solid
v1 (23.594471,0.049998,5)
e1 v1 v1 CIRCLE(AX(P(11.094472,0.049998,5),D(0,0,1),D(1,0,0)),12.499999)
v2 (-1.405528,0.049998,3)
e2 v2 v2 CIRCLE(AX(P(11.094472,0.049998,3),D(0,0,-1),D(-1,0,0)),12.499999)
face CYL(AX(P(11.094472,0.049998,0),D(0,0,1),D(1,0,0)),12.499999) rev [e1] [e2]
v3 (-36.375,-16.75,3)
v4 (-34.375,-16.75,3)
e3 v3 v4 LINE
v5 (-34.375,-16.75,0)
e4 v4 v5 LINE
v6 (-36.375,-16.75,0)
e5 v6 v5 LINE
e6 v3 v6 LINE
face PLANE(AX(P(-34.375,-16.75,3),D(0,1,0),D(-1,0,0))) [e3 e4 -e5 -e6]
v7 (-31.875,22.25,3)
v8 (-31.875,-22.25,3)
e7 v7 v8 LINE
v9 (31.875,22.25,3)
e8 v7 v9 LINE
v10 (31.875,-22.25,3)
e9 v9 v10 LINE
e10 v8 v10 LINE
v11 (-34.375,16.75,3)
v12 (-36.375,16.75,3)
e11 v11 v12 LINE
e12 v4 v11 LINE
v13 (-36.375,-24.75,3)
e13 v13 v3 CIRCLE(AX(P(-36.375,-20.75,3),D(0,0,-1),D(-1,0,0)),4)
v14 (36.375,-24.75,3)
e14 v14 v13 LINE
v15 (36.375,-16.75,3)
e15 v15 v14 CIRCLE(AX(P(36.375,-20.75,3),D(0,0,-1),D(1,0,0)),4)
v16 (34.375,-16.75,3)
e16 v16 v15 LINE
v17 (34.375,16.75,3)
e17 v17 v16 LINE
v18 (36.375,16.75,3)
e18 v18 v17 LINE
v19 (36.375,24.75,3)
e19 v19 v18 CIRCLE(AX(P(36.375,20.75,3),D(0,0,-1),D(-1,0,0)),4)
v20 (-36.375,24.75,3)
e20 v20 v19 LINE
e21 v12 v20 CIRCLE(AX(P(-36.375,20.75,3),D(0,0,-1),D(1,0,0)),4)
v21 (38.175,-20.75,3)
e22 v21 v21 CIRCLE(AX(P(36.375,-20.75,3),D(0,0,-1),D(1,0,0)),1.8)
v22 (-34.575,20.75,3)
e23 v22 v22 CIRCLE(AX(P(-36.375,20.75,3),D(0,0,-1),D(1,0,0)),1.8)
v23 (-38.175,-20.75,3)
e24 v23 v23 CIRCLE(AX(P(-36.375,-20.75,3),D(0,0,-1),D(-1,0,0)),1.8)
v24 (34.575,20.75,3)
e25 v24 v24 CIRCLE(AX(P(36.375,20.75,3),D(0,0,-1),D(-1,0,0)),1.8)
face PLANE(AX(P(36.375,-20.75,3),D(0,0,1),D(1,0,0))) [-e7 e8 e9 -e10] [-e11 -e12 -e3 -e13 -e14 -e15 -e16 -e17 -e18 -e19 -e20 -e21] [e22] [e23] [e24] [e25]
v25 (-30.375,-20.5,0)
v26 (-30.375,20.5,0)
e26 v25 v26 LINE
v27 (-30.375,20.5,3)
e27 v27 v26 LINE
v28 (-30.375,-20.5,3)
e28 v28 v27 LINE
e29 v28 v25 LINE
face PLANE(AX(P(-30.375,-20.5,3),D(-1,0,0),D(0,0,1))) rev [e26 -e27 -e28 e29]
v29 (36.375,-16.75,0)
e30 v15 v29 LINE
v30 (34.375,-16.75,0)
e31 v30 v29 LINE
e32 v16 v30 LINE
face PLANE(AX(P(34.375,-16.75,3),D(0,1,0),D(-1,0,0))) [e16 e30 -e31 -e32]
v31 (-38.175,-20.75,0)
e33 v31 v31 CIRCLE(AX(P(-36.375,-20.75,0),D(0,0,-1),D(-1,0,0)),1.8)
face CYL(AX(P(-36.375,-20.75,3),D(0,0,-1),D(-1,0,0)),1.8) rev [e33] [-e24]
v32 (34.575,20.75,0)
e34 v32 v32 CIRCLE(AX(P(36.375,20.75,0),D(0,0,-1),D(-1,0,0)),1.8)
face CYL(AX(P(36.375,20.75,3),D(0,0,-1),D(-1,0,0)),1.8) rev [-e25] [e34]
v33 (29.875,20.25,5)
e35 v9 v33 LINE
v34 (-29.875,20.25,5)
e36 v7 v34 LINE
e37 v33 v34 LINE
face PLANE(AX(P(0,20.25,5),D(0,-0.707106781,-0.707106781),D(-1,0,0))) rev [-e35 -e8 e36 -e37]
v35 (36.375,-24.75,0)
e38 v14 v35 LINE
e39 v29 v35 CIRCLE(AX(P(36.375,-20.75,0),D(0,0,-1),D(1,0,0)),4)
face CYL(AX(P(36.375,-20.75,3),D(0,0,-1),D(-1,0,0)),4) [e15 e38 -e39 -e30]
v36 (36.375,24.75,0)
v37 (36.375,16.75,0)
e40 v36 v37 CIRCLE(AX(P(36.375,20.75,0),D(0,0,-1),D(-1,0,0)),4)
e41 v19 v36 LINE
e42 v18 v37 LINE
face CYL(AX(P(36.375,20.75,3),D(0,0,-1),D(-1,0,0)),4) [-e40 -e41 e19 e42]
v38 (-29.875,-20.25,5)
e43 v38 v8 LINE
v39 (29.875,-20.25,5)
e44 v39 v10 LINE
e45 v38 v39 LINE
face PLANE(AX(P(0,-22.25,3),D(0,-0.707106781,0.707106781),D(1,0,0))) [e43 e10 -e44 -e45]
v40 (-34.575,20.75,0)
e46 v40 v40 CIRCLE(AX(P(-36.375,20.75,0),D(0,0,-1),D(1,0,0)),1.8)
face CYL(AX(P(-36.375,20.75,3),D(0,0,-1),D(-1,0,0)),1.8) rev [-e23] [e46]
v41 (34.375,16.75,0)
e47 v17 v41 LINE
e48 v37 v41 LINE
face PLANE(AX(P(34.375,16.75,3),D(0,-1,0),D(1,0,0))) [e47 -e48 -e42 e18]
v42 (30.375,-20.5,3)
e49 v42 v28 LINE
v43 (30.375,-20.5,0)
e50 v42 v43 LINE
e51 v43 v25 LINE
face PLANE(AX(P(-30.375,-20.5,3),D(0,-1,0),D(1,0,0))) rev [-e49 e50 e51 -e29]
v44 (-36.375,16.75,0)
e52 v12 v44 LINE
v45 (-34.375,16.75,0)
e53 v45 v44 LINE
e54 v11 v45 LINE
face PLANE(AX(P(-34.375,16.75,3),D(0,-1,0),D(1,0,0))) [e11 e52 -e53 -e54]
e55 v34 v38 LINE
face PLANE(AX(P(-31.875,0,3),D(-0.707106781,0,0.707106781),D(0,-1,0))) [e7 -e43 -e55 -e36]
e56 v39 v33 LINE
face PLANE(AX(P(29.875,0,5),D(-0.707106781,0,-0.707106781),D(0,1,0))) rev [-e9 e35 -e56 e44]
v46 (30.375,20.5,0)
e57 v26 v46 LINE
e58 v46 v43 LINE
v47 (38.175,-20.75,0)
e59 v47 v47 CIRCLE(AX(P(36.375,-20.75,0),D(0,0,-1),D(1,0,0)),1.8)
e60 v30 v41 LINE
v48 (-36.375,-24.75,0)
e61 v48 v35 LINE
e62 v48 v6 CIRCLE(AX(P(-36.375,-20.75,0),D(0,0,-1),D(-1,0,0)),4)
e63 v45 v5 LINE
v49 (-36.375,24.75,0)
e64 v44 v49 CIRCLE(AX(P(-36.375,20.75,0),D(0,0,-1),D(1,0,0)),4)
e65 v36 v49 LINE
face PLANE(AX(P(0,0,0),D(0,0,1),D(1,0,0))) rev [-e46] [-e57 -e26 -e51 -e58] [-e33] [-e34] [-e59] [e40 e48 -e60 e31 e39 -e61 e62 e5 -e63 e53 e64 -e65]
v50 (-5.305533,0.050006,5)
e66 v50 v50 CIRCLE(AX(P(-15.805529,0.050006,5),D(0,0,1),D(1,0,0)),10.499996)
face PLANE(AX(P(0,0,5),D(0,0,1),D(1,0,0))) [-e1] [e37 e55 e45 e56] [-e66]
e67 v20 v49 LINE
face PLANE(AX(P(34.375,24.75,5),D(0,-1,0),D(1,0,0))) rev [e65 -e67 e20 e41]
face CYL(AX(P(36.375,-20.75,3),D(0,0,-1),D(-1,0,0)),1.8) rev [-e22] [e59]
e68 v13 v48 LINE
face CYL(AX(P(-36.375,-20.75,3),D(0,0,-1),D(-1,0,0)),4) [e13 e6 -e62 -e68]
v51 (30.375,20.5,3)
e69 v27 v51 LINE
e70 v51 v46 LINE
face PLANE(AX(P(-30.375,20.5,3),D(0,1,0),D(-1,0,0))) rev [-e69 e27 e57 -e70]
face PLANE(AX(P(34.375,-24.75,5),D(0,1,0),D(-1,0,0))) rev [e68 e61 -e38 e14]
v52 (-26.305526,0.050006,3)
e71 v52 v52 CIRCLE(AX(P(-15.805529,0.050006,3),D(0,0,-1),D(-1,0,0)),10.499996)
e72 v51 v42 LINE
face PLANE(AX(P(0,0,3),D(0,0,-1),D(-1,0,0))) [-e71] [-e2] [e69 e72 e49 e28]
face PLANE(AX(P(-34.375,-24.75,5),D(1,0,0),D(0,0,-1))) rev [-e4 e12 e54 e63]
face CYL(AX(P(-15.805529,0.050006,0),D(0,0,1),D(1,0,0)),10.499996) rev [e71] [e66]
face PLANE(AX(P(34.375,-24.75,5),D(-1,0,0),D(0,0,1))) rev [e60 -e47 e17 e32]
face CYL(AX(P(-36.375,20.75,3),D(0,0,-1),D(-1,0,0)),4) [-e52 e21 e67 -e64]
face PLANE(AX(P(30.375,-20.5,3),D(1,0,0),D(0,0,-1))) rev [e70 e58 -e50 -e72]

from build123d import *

# Parameters (mm, degrees)
ESBO_O1_W                = 68.75
ESBO_O1_H                = 49.5
RESSALTO_EXTRUS_O1_DEPTH = 5
ESBO_O2_W                = 60.75
ESBO_O2_H                = 41
CORTE_EXTRUS_O1_DEPTH    = 3
ESBO_O3_R                = 1.8
RESSALTO_EXTRUS_O2_DEPTH = 3
ESBO_O4_W                = 68.75
ESBO_O4_H                = 49.5
ESBO_O4_W_2              = 63.75
ESBO_O4_H_2              = 44.5
CORTE_EXTRUS_O2_DEPTH    = 2
CHANFRO1_SIZE            = 2
ESBO_O6_R                = 10.499996118
ESBO_O6_R_2              = 12.499999064
CORTE_EXTRUS_O4_DEPTH    = 48.620406603


with BuildPart() as part:
    # Esboço1 → Ressalto-extrusão1 (new body)
    with BuildSketch(Plane.XY):
        Rectangle(ESBO_O1_W, ESBO_O1_H)
    extrude(amount=RESSALTO_EXTRUS_O1_DEPTH)

    # Esboço2 → Corte-extrusão1 (cut)
    with BuildSketch(Plane(origin=(0, 0, 0), x_dir=(-1, 0, 0), z_dir=(0, 0, -1))):
        Rectangle(ESBO_O2_W, ESBO_O2_H)
    extrude(amount=-CORTE_EXTRUS_O1_DEPTH, mode=Mode.SUBTRACT)

    # Esboço3 → Ressalto-extrusão2 (add)
    # profile 1 of 4: a face of its own
    with BuildSketch(Plane(origin=(0, 0, 0), x_dir=(-1, 0, 0), z_dir=(0, 0, -1))):
        with BuildLine():
            Line((-36.375, 24.75), (-34.375, 24.75))
            Line((-34.375, 24.75), (-34.375, 16.75))
            Line((-34.375, 16.75), (-36.375, 16.75))
            ThreePointArc((-36.375, 16.75), (-40.375, 20.75), (-36.375, 24.75))
        make_face()
        with Locations((-36.375, 20.75)):
            Circle(ESBO_O3_R, mode=Mode.SUBTRACT)
    # profile 2 of 4: a face of its own
    with BuildSketch(Plane(origin=(0, 0, 0), x_dir=(-1, 0, 0), z_dir=(0, 0, -1))):
        with BuildLine():
            Line((34.375, 16.75), (36.375, 16.75))
            ThreePointArc((36.375, 16.75), (40.375, 20.75), (36.375, 24.75))
            Line((36.375, 24.75), (34.375, 24.75))
            Line((34.375, 24.75), (34.375, 16.75))
        make_face()
        with Locations(Location((36.375, 20.75, 0), (0, 0, 180))):
            Circle(ESBO_O3_R, mode=Mode.SUBTRACT)
    # profile 3 of 4: a face of its own
    with BuildSketch(Plane(origin=(0, 0, 0), x_dir=(-1, 0, 0), z_dir=(0, 0, -1))):
        with BuildLine():
            Line((36.375, -24.75), (34.375, -24.75))
            Line((34.375, -24.75), (34.375, -16.75))
            Line((34.375, -16.75), (36.375, -16.75))
            ThreePointArc((36.375, -16.75), (40.375, -20.75), (36.375, -24.75))
        make_face()
        with Locations((36.375, -20.75)):
            Circle(ESBO_O3_R, mode=Mode.SUBTRACT)
    # profile 4 of 4: a face of its own
    with BuildSketch(Plane(origin=(0, 0, 0), x_dir=(-1, 0, 0), z_dir=(0, 0, -1))):
        with BuildLine():
            Line((-34.375, -16.75), (-36.375, -16.75))
            ThreePointArc((-36.375, -16.75), (-40.375, -20.75), (-36.375, -24.75))
            Line((-36.375, -24.75), (-34.375, -24.75))
            Line((-34.375, -24.75), (-34.375, -16.75))
        make_face()
        with Locations(Location((-36.375, -20.75, 0), (0, 0, 180))):
            Circle(ESBO_O3_R, mode=Mode.SUBTRACT)
    extrude(amount=-RESSALTO_EXTRUS_O2_DEPTH)

    # Esboço4 → Corte-extrusão2 (cut)
    with BuildSketch(Plane.XY.offset(5)):
        Rectangle(ESBO_O4_W, ESBO_O4_H)
        Rectangle(ESBO_O4_W_2, ESBO_O4_H_2, mode=Mode.SUBTRACT)
    extrude(amount=-CORTE_EXTRUS_O2_DEPTH, mode=Mode.SUBTRACT)

    # Chanfro1
    chanfro1_edges = [part.edges().sort_by_distance(p)[0] for p in [
        (31.875, 0, 5),
        (0, -22.25, 5),
        (-31.875, 0, 5),
        (0, 22.25, 5),
    ]]
    chamfer(chanfro1_edges, length=CHANFRO1_SIZE - 0.0001)  # a hair under: the kernel refuses the full size

    # Esboço6 → Corte-extrusão4 (cut, through all)
    with BuildSketch(Plane.XY.offset(5)):
        with Locations((-15.805529429, 0.050006416)):
            Circle(ESBO_O6_R)
        with Locations((11.094471539, 0.049998219)):
            Circle(ESBO_O6_R_2)
    extrude(amount=-CORTE_EXTRUS_O4_DEPTH, mode=Mode.SUBTRACT)


solid = part.part
